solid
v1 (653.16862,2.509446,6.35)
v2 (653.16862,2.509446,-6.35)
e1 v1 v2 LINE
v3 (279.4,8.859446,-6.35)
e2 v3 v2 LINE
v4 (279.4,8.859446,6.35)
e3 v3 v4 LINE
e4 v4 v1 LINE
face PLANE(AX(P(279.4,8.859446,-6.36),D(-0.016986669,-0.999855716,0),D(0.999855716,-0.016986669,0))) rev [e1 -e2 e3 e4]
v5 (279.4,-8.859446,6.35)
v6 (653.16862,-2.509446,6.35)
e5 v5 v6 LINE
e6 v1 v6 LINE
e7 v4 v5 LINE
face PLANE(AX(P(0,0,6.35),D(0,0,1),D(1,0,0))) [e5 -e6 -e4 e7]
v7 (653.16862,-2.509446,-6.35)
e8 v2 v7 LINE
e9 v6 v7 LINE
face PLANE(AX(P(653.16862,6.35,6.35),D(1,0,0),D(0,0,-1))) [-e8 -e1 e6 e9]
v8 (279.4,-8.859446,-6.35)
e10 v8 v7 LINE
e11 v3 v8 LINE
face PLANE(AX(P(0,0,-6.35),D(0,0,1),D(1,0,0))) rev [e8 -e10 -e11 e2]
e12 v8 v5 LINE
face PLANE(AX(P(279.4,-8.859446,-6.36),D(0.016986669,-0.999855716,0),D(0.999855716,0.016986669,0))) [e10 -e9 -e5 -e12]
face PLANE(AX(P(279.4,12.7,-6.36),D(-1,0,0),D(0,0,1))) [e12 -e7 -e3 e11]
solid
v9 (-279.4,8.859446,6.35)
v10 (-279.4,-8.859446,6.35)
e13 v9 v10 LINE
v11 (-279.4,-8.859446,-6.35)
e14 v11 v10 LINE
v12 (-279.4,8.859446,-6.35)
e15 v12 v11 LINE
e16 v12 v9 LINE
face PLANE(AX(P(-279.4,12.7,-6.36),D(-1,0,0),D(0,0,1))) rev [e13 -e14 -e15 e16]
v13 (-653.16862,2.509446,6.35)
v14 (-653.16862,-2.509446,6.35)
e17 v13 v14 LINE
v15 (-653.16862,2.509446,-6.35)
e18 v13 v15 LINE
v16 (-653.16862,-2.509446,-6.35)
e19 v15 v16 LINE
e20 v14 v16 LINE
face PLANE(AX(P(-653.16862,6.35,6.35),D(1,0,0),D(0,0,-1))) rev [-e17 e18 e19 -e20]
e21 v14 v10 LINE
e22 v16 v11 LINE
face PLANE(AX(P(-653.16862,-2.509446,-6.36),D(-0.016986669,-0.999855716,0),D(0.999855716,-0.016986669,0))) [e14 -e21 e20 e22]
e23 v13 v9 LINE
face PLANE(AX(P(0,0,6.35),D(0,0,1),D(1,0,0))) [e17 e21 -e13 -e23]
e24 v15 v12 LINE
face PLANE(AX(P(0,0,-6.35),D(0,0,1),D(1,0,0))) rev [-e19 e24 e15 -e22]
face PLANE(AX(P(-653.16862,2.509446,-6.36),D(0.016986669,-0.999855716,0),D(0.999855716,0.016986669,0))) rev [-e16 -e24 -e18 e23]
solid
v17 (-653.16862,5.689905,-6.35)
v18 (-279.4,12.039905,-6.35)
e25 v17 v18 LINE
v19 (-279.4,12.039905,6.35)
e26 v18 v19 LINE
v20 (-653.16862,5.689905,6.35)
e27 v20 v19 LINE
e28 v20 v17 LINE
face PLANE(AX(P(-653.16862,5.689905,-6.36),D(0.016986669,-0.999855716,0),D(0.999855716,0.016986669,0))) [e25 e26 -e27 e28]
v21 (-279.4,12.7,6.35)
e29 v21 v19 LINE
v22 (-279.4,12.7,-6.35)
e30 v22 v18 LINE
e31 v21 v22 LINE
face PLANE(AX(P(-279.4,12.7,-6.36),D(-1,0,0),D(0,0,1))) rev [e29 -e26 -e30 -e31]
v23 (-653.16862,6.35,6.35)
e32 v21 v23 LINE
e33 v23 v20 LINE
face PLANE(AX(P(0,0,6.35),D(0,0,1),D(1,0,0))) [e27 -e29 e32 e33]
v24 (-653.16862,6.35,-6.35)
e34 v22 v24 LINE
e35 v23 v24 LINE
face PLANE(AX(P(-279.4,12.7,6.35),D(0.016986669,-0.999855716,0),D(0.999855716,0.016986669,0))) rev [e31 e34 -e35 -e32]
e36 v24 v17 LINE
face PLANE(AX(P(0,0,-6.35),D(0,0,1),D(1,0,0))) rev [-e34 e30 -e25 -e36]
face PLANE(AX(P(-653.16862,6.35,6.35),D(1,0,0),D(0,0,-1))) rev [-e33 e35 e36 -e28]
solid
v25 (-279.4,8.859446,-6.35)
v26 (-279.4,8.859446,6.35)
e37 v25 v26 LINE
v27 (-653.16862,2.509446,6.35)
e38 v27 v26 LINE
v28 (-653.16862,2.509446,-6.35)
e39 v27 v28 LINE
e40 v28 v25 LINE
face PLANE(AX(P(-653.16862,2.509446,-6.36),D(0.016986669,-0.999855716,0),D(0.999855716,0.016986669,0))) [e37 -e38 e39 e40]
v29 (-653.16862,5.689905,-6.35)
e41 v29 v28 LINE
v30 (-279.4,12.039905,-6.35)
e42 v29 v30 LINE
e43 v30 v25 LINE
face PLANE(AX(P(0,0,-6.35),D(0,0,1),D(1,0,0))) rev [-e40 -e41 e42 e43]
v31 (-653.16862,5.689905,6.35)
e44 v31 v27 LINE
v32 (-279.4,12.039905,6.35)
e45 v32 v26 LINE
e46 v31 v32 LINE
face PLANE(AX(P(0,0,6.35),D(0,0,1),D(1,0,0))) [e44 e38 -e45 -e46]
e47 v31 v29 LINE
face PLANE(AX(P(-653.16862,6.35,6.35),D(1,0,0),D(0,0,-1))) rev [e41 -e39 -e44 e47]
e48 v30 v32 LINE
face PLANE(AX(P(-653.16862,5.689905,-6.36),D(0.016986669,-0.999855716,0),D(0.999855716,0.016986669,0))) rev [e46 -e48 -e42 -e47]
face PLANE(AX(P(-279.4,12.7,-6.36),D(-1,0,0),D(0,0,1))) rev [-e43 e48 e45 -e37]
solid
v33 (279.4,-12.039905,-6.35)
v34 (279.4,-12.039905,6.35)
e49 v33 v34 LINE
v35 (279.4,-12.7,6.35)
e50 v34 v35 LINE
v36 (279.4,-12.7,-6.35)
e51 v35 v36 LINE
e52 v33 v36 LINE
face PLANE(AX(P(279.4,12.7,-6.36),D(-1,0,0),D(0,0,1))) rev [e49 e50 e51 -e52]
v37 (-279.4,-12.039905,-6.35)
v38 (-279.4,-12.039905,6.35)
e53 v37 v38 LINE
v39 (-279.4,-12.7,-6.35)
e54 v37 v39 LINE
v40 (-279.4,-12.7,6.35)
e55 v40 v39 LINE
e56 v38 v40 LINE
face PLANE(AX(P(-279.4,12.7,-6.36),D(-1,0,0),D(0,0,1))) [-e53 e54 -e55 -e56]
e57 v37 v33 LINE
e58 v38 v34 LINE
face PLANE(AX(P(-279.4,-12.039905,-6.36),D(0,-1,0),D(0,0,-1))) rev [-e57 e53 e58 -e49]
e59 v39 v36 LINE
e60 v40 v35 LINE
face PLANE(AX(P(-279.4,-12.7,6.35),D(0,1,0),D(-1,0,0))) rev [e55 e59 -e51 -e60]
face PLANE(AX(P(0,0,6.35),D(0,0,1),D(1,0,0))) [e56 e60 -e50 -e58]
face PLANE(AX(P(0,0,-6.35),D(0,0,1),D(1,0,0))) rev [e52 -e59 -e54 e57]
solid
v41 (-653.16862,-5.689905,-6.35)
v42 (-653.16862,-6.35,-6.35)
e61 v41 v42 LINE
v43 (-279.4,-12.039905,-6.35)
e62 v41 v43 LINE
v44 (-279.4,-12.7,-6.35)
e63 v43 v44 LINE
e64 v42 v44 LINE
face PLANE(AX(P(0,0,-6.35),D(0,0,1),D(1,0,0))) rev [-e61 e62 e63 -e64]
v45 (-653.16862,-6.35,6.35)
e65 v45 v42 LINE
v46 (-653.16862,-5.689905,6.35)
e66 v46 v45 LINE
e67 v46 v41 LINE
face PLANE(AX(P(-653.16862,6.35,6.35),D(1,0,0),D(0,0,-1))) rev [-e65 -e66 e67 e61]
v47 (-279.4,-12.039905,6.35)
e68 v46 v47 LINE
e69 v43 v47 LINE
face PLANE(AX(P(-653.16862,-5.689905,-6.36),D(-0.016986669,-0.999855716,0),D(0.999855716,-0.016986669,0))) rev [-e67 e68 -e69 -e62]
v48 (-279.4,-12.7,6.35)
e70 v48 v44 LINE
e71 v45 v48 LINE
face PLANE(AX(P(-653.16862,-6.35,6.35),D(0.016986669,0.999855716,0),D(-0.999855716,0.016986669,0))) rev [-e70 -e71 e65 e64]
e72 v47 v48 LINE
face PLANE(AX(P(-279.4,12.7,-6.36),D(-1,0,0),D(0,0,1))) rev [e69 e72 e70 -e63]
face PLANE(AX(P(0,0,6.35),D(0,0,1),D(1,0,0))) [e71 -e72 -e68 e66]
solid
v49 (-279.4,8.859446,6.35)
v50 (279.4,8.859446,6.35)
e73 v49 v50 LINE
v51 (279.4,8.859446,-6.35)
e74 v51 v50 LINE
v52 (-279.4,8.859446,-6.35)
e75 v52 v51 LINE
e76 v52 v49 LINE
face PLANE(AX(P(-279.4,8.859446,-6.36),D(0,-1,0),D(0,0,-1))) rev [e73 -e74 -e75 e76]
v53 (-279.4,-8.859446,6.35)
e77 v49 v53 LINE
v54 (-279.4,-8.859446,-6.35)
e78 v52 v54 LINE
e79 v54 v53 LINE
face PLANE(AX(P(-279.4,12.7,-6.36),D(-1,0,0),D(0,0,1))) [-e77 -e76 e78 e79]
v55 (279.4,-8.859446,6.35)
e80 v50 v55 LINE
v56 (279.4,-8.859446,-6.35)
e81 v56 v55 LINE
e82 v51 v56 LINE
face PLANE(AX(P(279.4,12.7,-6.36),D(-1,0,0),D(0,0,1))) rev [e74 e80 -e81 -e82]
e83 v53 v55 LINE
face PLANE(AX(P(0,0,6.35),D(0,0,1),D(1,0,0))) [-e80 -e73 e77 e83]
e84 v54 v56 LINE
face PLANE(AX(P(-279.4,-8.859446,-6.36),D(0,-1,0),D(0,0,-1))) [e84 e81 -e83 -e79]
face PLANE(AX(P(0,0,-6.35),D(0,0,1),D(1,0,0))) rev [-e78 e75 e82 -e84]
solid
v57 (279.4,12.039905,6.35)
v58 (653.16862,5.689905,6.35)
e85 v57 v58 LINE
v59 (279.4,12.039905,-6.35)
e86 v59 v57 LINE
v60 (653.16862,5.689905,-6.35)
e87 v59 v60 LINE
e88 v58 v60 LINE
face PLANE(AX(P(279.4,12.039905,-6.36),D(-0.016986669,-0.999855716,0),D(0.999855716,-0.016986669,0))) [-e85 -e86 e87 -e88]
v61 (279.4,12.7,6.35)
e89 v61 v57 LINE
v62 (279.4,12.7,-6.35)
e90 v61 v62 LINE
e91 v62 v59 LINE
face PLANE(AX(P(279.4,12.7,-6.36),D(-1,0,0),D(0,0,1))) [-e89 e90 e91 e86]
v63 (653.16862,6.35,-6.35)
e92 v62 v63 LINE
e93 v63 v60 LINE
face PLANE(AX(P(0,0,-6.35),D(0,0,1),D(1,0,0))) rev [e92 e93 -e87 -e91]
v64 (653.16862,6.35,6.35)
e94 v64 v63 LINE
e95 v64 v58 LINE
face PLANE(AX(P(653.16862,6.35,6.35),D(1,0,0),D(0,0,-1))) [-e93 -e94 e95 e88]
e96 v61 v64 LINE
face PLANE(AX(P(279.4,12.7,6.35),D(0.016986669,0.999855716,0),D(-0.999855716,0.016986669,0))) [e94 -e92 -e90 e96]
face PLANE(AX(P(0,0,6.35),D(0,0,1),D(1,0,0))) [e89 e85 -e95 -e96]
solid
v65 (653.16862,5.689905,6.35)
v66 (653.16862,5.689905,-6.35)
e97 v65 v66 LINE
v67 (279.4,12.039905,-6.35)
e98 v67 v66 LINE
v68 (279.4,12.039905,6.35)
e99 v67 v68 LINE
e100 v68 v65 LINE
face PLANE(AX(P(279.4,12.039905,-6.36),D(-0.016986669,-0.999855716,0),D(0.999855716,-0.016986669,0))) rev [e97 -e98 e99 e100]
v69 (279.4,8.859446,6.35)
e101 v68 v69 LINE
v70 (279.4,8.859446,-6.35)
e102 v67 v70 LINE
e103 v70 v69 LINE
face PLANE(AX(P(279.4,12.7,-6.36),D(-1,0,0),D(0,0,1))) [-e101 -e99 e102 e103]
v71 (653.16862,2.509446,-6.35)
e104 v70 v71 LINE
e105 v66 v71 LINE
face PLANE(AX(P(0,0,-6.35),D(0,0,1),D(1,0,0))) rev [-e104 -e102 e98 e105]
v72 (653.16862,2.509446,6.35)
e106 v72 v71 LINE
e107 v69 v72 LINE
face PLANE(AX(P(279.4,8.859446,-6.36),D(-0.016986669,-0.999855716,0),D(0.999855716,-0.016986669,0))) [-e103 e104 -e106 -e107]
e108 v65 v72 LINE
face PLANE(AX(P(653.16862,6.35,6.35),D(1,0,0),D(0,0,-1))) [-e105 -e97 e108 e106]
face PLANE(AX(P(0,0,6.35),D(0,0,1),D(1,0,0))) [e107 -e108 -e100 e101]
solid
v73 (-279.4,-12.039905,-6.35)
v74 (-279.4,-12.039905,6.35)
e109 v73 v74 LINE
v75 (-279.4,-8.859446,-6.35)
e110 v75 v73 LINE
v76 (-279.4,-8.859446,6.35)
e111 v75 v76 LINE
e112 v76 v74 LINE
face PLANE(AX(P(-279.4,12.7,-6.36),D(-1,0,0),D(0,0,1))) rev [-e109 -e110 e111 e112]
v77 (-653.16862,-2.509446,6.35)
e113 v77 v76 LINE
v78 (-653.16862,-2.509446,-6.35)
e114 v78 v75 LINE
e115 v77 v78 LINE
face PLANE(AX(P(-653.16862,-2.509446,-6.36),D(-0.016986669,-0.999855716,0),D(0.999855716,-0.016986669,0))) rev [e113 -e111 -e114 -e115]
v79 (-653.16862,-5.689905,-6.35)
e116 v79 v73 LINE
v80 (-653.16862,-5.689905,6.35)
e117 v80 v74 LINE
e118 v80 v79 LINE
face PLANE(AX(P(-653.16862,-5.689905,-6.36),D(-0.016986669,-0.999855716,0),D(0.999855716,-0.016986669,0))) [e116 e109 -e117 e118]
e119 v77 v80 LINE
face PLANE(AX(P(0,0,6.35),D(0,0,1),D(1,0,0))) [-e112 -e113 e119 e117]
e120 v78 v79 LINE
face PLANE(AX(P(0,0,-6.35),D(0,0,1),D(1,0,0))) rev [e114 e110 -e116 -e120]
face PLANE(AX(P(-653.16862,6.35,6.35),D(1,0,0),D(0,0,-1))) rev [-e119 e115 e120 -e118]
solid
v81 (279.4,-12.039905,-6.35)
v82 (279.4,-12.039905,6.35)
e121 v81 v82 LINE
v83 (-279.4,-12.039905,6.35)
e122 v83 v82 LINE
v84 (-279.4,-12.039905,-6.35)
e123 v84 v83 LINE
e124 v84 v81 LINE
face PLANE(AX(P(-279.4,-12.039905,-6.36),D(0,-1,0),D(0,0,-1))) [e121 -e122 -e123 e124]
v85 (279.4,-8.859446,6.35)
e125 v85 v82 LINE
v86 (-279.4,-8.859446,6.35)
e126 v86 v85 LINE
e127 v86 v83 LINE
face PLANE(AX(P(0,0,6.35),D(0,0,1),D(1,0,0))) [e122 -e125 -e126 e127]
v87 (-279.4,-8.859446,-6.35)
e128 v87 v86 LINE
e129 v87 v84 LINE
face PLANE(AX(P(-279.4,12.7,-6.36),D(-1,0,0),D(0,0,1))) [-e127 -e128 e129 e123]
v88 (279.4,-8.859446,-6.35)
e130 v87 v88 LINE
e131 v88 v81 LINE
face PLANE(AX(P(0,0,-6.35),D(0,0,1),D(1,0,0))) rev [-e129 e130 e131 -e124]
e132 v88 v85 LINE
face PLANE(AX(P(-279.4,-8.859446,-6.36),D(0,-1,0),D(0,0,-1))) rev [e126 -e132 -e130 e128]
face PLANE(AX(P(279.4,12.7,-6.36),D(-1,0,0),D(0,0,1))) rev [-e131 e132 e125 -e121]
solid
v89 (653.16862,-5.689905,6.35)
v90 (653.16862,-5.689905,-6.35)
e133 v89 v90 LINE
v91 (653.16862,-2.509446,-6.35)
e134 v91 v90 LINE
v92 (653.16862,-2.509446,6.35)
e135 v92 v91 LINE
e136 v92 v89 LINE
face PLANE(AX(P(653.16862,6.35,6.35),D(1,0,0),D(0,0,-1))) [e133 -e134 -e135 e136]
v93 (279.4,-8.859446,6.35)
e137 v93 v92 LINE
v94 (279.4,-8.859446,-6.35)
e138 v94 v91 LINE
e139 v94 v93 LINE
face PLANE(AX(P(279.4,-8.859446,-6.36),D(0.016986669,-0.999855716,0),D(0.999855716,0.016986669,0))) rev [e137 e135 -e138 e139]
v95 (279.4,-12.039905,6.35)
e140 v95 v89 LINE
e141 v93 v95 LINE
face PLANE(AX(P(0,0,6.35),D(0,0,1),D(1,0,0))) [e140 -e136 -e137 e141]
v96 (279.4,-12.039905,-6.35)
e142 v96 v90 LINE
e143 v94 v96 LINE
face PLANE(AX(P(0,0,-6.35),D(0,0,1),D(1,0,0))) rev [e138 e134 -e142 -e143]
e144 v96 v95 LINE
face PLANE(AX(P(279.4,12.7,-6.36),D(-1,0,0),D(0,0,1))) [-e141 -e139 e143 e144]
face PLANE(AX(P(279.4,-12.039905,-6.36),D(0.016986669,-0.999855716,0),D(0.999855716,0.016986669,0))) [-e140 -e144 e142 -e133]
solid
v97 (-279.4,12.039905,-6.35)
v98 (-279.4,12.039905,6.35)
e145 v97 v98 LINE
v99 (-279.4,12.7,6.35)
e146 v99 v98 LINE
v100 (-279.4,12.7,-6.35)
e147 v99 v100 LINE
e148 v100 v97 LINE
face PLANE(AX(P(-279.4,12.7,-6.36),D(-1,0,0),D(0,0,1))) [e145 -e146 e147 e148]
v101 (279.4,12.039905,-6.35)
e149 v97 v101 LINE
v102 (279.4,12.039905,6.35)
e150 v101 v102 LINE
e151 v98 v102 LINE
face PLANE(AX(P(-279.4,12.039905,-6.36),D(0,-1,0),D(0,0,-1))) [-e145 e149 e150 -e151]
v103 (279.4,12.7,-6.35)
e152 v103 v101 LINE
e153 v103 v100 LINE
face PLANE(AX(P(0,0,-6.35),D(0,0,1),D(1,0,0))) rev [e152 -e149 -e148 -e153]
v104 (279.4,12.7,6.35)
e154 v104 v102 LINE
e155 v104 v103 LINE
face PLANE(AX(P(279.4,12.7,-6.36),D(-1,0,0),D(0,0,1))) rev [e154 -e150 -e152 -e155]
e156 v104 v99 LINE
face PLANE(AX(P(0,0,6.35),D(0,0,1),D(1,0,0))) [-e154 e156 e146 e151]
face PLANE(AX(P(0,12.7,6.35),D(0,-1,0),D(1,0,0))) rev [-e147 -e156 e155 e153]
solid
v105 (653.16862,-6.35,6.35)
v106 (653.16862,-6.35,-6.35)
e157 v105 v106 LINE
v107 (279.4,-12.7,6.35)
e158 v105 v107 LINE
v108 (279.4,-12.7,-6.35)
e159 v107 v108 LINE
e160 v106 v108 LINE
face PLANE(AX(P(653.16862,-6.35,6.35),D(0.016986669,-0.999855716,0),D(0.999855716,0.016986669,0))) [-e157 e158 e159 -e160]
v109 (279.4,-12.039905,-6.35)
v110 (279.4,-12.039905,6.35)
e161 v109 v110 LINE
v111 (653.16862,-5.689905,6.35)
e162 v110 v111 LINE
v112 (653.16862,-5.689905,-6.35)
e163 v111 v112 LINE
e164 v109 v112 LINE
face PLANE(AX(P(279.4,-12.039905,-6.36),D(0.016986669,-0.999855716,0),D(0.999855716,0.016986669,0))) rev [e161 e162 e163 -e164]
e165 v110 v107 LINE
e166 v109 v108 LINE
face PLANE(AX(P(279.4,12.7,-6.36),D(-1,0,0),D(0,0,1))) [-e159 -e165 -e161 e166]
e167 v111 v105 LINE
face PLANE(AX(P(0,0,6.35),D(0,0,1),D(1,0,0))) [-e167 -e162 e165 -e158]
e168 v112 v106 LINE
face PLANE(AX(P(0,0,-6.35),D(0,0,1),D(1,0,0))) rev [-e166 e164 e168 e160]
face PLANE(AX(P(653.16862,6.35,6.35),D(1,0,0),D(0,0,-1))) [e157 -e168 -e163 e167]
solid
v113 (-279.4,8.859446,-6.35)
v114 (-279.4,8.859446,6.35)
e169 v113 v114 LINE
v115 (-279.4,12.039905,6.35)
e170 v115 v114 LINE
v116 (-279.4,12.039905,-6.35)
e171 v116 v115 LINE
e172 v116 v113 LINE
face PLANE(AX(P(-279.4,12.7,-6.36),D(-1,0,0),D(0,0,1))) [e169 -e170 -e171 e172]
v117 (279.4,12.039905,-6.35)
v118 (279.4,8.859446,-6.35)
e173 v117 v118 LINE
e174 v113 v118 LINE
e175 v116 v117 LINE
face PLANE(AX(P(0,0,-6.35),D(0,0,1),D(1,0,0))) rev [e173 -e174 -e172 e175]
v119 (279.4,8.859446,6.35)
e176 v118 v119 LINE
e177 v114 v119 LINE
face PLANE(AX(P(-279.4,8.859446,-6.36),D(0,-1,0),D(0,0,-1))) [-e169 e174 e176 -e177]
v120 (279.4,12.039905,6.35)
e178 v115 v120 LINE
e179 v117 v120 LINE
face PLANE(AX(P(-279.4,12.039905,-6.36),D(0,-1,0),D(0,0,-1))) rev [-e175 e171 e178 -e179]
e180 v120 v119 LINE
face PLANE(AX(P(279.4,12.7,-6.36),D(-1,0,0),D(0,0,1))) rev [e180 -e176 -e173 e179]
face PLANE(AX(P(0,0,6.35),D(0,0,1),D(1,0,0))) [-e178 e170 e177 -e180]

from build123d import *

# Parameters (mm, degrees)
BOSS_EXTRUDE1_DEPTH      = 6.35
SPLIT1_SURFACE_1_1_BACK  = 1307.646
SPLIT1_SURFACE_1_1_DEPTH = 2615.292
SPLIT1_SURFACE_1_2_BACK  = 1307.646
SPLIT1_SURFACE_1_2_DEPTH = 2615.292
SPLIT1_SURFACE_2_3_BACK  = 1307.646
SPLIT1_SURFACE_2_3_DEPTH = 2615.292
SPLIT1_SURFACE_2_4_BACK  = 1307.646
SPLIT1_SURFACE_2_4_DEPTH = 2615.292
SPLIT1_SURFACE_4_5_BACK  = 1307.646
SPLIT1_SURFACE_4_5_DEPTH = 2615.292
SPLIT1_SURFACE_4_6_BACK  = 1307.646
SPLIT1_SURFACE_4_6_DEPTH = 2615.292
SPLIT1_SURFACE_5_7_BACK  = 1307.646
SPLIT1_SURFACE_5_7_DEPTH = 2615.292
SPLIT1_SURFACE_5_8_BACK  = 1307.646
SPLIT1_SURFACE_5_8_DEPTH = 2615.292
SPLIT2_START             = -653.16862
SPLIT2_OUTLINE_W         = 8.7
SPLIT2_OUTLINE_H         = 12.7
SPLIT2_DEPTH             = 932.56862
SPLIT2_START_2           = -6.35
SPLIT2_2_DEPTH           = 12.7
SPLIT2_START_3           = 12.039904759
SPLIT2_3_OUTLINE_W       = 558.8
SPLIT2_3_OUTLINE_H       = 12.7
SPLIT2_3_DEPTH           = 0.660095241
SPLIT2_4_OUTLINE_W       = 11.039904759
SPLIT2_4_OUTLINE_H       = 12.7
SPLIT2_4_DEPTH           = 932.56862
SPLIT2_5_DEPTH           = 12.7
SPLIT2_START_4           = 8.85944587
SPLIT2_6_OUTLINE_W       = 558.8
SPLIT2_6_OUTLINE_H       = 12.7
SPLIT2_6_DEPTH           = 3.180458889
SPLIT2_7_DEPTH           = 12.7
SPLIT2_8_DEPTH           = 12.7
SPLIT2_9_OUTLINE_W       = 20
SPLIT2_9_OUTLINE_H       = 12.7
SPLIT2_9_DEPTH           = 373.76862
SPLIT2_START_5           = 279.4
SPLIT2_10_OUTLINE_W      = 20
SPLIT2_10_OUTLINE_H      = 12.7
SPLIT2_10_DEPTH          = 373.76862
SPLIT2_11_OUTLINE_W      = 11.039904759
SPLIT2_11_OUTLINE_H      = 12.7
SPLIT2_11_DEPTH          = 932.56862
SPLIT2_12_DEPTH          = 12.7
SPLIT2_START_6           = -12.039904759
SPLIT2_13_OUTLINE_W      = 558.8
SPLIT2_13_OUTLINE_H      = 12.7
SPLIT2_13_DEPTH          = 3.180458889
SPLIT2_14_OUTLINE_W      = 8.7
SPLIT2_14_OUTLINE_H      = 12.7
SPLIT2_14_DEPTH          = 932.56862
SPLIT2_15_DEPTH          = 12.7
SPLIT2_16_OUTLINE_W      = 558.8
SPLIT2_16_OUTLINE_H      = 0.660095241
SPLIT2_16_DEPTH          = 12.7


# Read off the part's stored shape, not the designer's step: Split2
with BuildPart() as part:
    # Sketch1 → Boss-Extrude1 (new, symmetric)
    with BuildSketch(Plane.XY):
        Polygon((-653.16862, 6.35), (-653.16862, -6.35), (-279.4, -12.7), (0, -12.7), (0, 12.7), (-279.4, 12.7), align=None)
    boss_extrude1 = extrude(amount=BOSS_EXTRUDE1_DEPTH, both=True)

    # Mirror1: Boss-Extrude1 across Right Plane
    add(boss_extrude1.mirror(Plane(origin=(0, 0, 0), x_dir=(0, 0, -1), z_dir=(1, 0, 0))))


with BuildPart() as body_2:
    # Split1: the piece behind the surface
    add(part.part)
    # Split1 surface 1: a surface, the sketch's curves swept straight by 2615.292 mm
    with BuildLine(Plane.XY.offset(6.35).offset(-SPLIT1_SURFACE_1_1_BACK), mode=Mode.PRIVATE) as split1_surface_1_1_path:
        Line((653.16862, 5.689904759), (279.4, 12.039904759))
        Line((279.4, 12.039904759), (-279.4, 12.039904759))
        Line((-279.4, 12.039904759), (-653.16862, 5.689904759))
    split1_surface_1_1 = Shell.extrude(split1_surface_1_1_path.wire(), (0 * SPLIT1_SURFACE_1_1_DEPTH, 0 * SPLIT1_SURFACE_1_1_DEPTH, 1 * SPLIT1_SURFACE_1_1_DEPTH))
    split(bisect_by=split1_surface_1_1, keep=Keep.BOTTOM)

    # Split2 outline → Split2 (cut)
    with BuildSketch(Plane.YZ.offset(SPLIT2_START)):
        with Locations((8.35, 0)):
            Rectangle(SPLIT2_OUTLINE_W, SPLIT2_OUTLINE_H)
    extrude(amount=SPLIT2_DEPTH, mode=Mode.SUBTRACT)


with BuildPart() as part_1:
    add(part.part)

    # Split1: split by a surface, the side it looks to stays
    # Split1 surface 1: a surface, the sketch's curves swept straight by 2615.292 mm
    with BuildLine(Plane.XY.offset(6.35).offset(-SPLIT1_SURFACE_1_2_BACK), mode=Mode.PRIVATE) as split1_surface_1_2_path:
        Line((653.16862, 5.689904759), (279.4, 12.039904759))
        Line((279.4, 12.039904759), (-279.4, 12.039904759))
        Line((-279.4, 12.039904759), (-653.16862, 5.689904759))
    split1_surface_1_2 = Shell.extrude(split1_surface_1_2_path.wire(), (0 * SPLIT1_SURFACE_1_2_DEPTH, 0 * SPLIT1_SURFACE_1_2_DEPTH, 1 * SPLIT1_SURFACE_1_2_DEPTH))
    split(bisect_by=split1_surface_1_2, keep=Keep.TOP)


with BuildPart() as body_3:
    # Split1 2: the piece behind the surface
    add(part_1.part)
    # Split1 surface 2: a surface, the sketch's curves swept straight by 2615.292 mm
    with BuildLine(Plane.XY.offset(6.35).offset(-SPLIT1_SURFACE_2_3_BACK), mode=Mode.PRIVATE) as split1_surface_2_3_path:
        Line((653.16862, 2.50944587), (279.4, 8.85944587))
        Line((279.4, 8.85944587), (-279.4, 8.85944587))
        Line((-279.4, 8.85944587), (-653.16862, 2.50944587))
    split1_surface_2_3 = Shell.extrude(split1_surface_2_3_path.wire(), (0 * SPLIT1_SURFACE_2_3_DEPTH, 0 * SPLIT1_SURFACE_2_3_DEPTH, 1 * SPLIT1_SURFACE_2_3_DEPTH))
    split(bisect_by=split1_surface_2_3, keep=Keep.BOTTOM)

    # Split2 4 outline → Split2 4 (cut)
    with BuildSketch(Plane.YZ.offset(SPLIT2_START)):
        with Locations((6.51995238, 0)):
            Rectangle(SPLIT2_4_OUTLINE_W, SPLIT2_4_OUTLINE_H)
    extrude(amount=SPLIT2_4_DEPTH, mode=Mode.SUBTRACT)


with BuildPart() as part_2:
    add(part_1.part)

    # Split1 2: split by a surface, the side it looks to stays
    # Split1 surface 2: a surface, the sketch's curves swept straight by 2615.292 mm
    with BuildLine(Plane.XY.offset(6.35).offset(-SPLIT1_SURFACE_2_4_BACK), mode=Mode.PRIVATE) as split1_surface_2_4_path:
        Line((653.16862, 2.50944587), (279.4, 8.85944587))
        Line((279.4, 8.85944587), (-279.4, 8.85944587))
        Line((-279.4, 8.85944587), (-653.16862, 2.50944587))
    split1_surface_2_4 = Shell.extrude(split1_surface_2_4_path.wire(), (0 * SPLIT1_SURFACE_2_4_DEPTH, 0 * SPLIT1_SURFACE_2_4_DEPTH, 1 * SPLIT1_SURFACE_2_4_DEPTH))
    split(bisect_by=split1_surface_2_4, keep=Keep.TOP)


with BuildPart() as body_4_3:
    # Split1 4: the piece behind the surface
    add(part_2.part)
    # Split1 surface 4: a surface, the sketch's curves swept straight by 2615.292 mm
    with BuildLine(Plane.XY.offset(6.35).offset(-SPLIT1_SURFACE_4_5_BACK), mode=Mode.PRIVATE) as split1_surface_4_5_path:
        Line((-653.16862, -2.50944587), (-279.4, -8.85944587))
        Line((-279.4, -8.85944587), (279.4, -8.85944587))
        Line((279.4, -8.85944587), (653.16862, -2.50944587))
    split1_surface_4_5 = Shell.extrude(split1_surface_4_5_path.wire(), (0 * SPLIT1_SURFACE_4_5_DEPTH, 0 * SPLIT1_SURFACE_4_5_DEPTH, 1 * SPLIT1_SURFACE_4_5_DEPTH))
    split(bisect_by=split1_surface_4_5, keep=Keep.BOTTOM)


with BuildPart() as part_3:
    add(part_2.part)

    # Split1 4: split by a surface, the side it looks to stays
    # Split1 surface 4: a surface, the sketch's curves swept straight by 2615.292 mm
    with BuildLine(Plane.XY.offset(6.35).offset(-SPLIT1_SURFACE_4_6_BACK), mode=Mode.PRIVATE) as split1_surface_4_6_path:
        Line((-653.16862, -2.50944587), (-279.4, -8.85944587))
        Line((-279.4, -8.85944587), (279.4, -8.85944587))
        Line((279.4, -8.85944587), (653.16862, -2.50944587))
    split1_surface_4_6 = Shell.extrude(split1_surface_4_6_path.wire(), (0 * SPLIT1_SURFACE_4_6_DEPTH, 0 * SPLIT1_SURFACE_4_6_DEPTH, 1 * SPLIT1_SURFACE_4_6_DEPTH))
    split(bisect_by=split1_surface_4_6, keep=Keep.TOP)

    # Split2 9 outline → Split2 9 (cut)
    with BuildSketch(Plane.YZ.offset(SPLIT2_START)):
        Rectangle(SPLIT2_9_OUTLINE_W, SPLIT2_9_OUTLINE_H)
    extrude(amount=SPLIT2_9_DEPTH, mode=Mode.SUBTRACT)

    # Split2 10 outline → Split2 10 (cut)
    with BuildSketch(Plane.YZ.offset(SPLIT2_START_5)):
        Rectangle(SPLIT2_10_OUTLINE_W, SPLIT2_10_OUTLINE_H)
    extrude(amount=SPLIT2_10_DEPTH, mode=Mode.SUBTRACT)


with BuildPart() as body_5_2:
    # Split1 5 body 4 3: the piece behind the surface
    add(body_4_3.part)
    # Split1 surface 5: a surface, the sketch's curves swept straight by 2615.292 mm
    with BuildLine(Plane.XY.offset(6.35).offset(-SPLIT1_SURFACE_5_7_BACK), mode=Mode.PRIVATE) as split1_surface_5_7_path:
        Line((-653.16862, -5.689904759), (-279.4, -12.039904759))
        Line((-279.4, -12.039904759), (279.4, -12.039904759))
        Line((279.4, -12.039904759), (653.16862, -5.689904759))
    split1_surface_5_7 = Shell.extrude(split1_surface_5_7_path.wire(), (0 * SPLIT1_SURFACE_5_7_DEPTH, 0 * SPLIT1_SURFACE_5_7_DEPTH, 1 * SPLIT1_SURFACE_5_7_DEPTH))
    split(bisect_by=split1_surface_5_7, keep=Keep.BOTTOM)

    # Split2 14 outline → Split2 14 (cut)
    with BuildSketch(Plane.YZ.offset(SPLIT2_START)):
        with Locations((-8.35, 0)):
            Rectangle(SPLIT2_14_OUTLINE_W, SPLIT2_14_OUTLINE_H)
    extrude(amount=SPLIT2_14_DEPTH, mode=Mode.SUBTRACT)


with BuildPart() as body_4_3_1:
    add(body_4_3.part)

    # Split1 5 body 4 3: split by a surface, the side it looks to stays
    # Split1 surface 5: a surface, the sketch's curves swept straight by 2615.292 mm
    with BuildLine(Plane.XY.offset(6.35).offset(-SPLIT1_SURFACE_5_8_BACK), mode=Mode.PRIVATE) as split1_surface_5_8_path:
        Line((-653.16862, -5.689904759), (-279.4, -12.039904759))
        Line((-279.4, -12.039904759), (279.4, -12.039904759))
        Line((279.4, -12.039904759), (653.16862, -5.689904759))
    split1_surface_5_8 = Shell.extrude(split1_surface_5_8_path.wire(), (0 * SPLIT1_SURFACE_5_8_DEPTH, 0 * SPLIT1_SURFACE_5_8_DEPTH, 1 * SPLIT1_SURFACE_5_8_DEPTH))
    split(bisect_by=split1_surface_5_8, keep=Keep.TOP)

    # Split2 11 outline → Split2 11 (cut)
    with BuildSketch(Plane.YZ.offset(SPLIT2_START)):
        with Locations((-6.51995238, 0)):
            Rectangle(SPLIT2_11_OUTLINE_W, SPLIT2_11_OUTLINE_H)
    extrude(amount=SPLIT2_11_DEPTH, mode=Mode.SUBTRACT)


with BuildPart() as body_6_2:
    # Split2 2 outline → Split2 2 (new body)
    with BuildSketch(Plane.XY.offset(SPLIT2_START_2)):
        Polygon((-279.4, 12.039904759), (-279.4, 12.7), (-653.16862, 6.35), (-653.16862, 5.689904759), align=None)
    extrude(amount=SPLIT2_2_DEPTH)


with BuildPart() as body_7:
    # Split2 3 outline → Split2 3 (new body)
    with BuildSketch(Plane(origin=(0, 0, 0), x_dir=(1, 0, 0), z_dir=(0, 1, 0)).offset(SPLIT2_START_3)):
        Rectangle(SPLIT2_3_OUTLINE_W, SPLIT2_3_OUTLINE_H)
    extrude(amount=SPLIT2_3_DEPTH)


with BuildPart() as body_8:
    # Split2 5 outline → Split2 5 (new body)
    with BuildSketch(Plane.XY.offset(SPLIT2_START_2)):
        Polygon((-279.4, 8.85944587), (-279.4, 12.039904759), (-653.16862, 5.689904759), (-653.16862, 2.50944587), align=None)
    extrude(amount=SPLIT2_5_DEPTH)


with BuildPart() as body_9:
    # Split2 6 outline → Split2 6 (new body)
    with BuildSketch(Plane(origin=(0, 0, 0), x_dir=(1, 0, 0), z_dir=(0, 1, 0)).offset(SPLIT2_START_4)):
        Rectangle(SPLIT2_6_OUTLINE_W, SPLIT2_6_OUTLINE_H)
    extrude(amount=SPLIT2_6_DEPTH)


with BuildPart() as body_10:
    # Split2 7 outline → Split2 7 (new body)
    with BuildSketch(Plane.XY.offset(SPLIT2_START_2)):
        Polygon((653.16862, 2.50944587), (279.4, 8.85944587), (279.4, -8.85944587), (653.16862, -2.50944587), align=None)
    extrude(amount=SPLIT2_7_DEPTH)


with BuildPart() as body_11:
    # Split2 8 outline → Split2 8 (new body)
    with BuildSketch(Plane.XY.offset(SPLIT2_START_2)):
        Polygon((-279.4, -8.85944587), (-279.4, 8.85944587), (-653.16862, 2.50944587), (-653.16862, -2.50944587), align=None)
    extrude(amount=SPLIT2_8_DEPTH)


with BuildPart() as body_12:
    # Split2 12 outline → Split2 12 (new body)
    with BuildSketch(Plane.XY.offset(SPLIT2_START_2)):
        Polygon((-279.4, -12.039904759), (-279.4, -8.85944587), (-653.16862, -2.50944587), (-653.16862, -5.689904759), align=None)
    extrude(amount=SPLIT2_12_DEPTH)


with BuildPart() as body_13:
    # Split2 13 outline → Split2 13 (new body)
    with BuildSketch(Plane(origin=(0, 0, 0), x_dir=(1, 0, 0), z_dir=(0, 1, 0)).offset(SPLIT2_START_6)):
        Rectangle(SPLIT2_13_OUTLINE_W, SPLIT2_13_OUTLINE_H)
    extrude(amount=SPLIT2_13_DEPTH)


with BuildPart() as body_14:
    # Split2 15 outline → Split2 15 (new body)
    with BuildSketch(Plane.XY.offset(SPLIT2_START_2)):
        Polygon((-279.4, -12.7), (-279.4, -12.039904759), (-653.16862, -5.689904759), (-653.16862, -6.35), align=None)
    extrude(amount=SPLIT2_15_DEPTH)


with BuildPart() as body_15:
    # Split2 16 outline → Split2 16 (new body)
    with BuildSketch(Plane.XY.offset(SPLIT2_START_2)):
        with Locations((0, -12.36995238)):
            Rectangle(SPLIT2_16_OUTLINE_W, SPLIT2_16_OUTLINE_H)
    extrude(amount=SPLIT2_16_DEPTH)


solid = Compound([body_2.part, body_3.part, part_3.part, body_5_2.part, body_4_3_1.part, body_6_2.part, body_7.part, body_8.part, body_9.part, body_10.part, body_11.part, body_12.part, body_13.part, body_14.part, body_15.part])
